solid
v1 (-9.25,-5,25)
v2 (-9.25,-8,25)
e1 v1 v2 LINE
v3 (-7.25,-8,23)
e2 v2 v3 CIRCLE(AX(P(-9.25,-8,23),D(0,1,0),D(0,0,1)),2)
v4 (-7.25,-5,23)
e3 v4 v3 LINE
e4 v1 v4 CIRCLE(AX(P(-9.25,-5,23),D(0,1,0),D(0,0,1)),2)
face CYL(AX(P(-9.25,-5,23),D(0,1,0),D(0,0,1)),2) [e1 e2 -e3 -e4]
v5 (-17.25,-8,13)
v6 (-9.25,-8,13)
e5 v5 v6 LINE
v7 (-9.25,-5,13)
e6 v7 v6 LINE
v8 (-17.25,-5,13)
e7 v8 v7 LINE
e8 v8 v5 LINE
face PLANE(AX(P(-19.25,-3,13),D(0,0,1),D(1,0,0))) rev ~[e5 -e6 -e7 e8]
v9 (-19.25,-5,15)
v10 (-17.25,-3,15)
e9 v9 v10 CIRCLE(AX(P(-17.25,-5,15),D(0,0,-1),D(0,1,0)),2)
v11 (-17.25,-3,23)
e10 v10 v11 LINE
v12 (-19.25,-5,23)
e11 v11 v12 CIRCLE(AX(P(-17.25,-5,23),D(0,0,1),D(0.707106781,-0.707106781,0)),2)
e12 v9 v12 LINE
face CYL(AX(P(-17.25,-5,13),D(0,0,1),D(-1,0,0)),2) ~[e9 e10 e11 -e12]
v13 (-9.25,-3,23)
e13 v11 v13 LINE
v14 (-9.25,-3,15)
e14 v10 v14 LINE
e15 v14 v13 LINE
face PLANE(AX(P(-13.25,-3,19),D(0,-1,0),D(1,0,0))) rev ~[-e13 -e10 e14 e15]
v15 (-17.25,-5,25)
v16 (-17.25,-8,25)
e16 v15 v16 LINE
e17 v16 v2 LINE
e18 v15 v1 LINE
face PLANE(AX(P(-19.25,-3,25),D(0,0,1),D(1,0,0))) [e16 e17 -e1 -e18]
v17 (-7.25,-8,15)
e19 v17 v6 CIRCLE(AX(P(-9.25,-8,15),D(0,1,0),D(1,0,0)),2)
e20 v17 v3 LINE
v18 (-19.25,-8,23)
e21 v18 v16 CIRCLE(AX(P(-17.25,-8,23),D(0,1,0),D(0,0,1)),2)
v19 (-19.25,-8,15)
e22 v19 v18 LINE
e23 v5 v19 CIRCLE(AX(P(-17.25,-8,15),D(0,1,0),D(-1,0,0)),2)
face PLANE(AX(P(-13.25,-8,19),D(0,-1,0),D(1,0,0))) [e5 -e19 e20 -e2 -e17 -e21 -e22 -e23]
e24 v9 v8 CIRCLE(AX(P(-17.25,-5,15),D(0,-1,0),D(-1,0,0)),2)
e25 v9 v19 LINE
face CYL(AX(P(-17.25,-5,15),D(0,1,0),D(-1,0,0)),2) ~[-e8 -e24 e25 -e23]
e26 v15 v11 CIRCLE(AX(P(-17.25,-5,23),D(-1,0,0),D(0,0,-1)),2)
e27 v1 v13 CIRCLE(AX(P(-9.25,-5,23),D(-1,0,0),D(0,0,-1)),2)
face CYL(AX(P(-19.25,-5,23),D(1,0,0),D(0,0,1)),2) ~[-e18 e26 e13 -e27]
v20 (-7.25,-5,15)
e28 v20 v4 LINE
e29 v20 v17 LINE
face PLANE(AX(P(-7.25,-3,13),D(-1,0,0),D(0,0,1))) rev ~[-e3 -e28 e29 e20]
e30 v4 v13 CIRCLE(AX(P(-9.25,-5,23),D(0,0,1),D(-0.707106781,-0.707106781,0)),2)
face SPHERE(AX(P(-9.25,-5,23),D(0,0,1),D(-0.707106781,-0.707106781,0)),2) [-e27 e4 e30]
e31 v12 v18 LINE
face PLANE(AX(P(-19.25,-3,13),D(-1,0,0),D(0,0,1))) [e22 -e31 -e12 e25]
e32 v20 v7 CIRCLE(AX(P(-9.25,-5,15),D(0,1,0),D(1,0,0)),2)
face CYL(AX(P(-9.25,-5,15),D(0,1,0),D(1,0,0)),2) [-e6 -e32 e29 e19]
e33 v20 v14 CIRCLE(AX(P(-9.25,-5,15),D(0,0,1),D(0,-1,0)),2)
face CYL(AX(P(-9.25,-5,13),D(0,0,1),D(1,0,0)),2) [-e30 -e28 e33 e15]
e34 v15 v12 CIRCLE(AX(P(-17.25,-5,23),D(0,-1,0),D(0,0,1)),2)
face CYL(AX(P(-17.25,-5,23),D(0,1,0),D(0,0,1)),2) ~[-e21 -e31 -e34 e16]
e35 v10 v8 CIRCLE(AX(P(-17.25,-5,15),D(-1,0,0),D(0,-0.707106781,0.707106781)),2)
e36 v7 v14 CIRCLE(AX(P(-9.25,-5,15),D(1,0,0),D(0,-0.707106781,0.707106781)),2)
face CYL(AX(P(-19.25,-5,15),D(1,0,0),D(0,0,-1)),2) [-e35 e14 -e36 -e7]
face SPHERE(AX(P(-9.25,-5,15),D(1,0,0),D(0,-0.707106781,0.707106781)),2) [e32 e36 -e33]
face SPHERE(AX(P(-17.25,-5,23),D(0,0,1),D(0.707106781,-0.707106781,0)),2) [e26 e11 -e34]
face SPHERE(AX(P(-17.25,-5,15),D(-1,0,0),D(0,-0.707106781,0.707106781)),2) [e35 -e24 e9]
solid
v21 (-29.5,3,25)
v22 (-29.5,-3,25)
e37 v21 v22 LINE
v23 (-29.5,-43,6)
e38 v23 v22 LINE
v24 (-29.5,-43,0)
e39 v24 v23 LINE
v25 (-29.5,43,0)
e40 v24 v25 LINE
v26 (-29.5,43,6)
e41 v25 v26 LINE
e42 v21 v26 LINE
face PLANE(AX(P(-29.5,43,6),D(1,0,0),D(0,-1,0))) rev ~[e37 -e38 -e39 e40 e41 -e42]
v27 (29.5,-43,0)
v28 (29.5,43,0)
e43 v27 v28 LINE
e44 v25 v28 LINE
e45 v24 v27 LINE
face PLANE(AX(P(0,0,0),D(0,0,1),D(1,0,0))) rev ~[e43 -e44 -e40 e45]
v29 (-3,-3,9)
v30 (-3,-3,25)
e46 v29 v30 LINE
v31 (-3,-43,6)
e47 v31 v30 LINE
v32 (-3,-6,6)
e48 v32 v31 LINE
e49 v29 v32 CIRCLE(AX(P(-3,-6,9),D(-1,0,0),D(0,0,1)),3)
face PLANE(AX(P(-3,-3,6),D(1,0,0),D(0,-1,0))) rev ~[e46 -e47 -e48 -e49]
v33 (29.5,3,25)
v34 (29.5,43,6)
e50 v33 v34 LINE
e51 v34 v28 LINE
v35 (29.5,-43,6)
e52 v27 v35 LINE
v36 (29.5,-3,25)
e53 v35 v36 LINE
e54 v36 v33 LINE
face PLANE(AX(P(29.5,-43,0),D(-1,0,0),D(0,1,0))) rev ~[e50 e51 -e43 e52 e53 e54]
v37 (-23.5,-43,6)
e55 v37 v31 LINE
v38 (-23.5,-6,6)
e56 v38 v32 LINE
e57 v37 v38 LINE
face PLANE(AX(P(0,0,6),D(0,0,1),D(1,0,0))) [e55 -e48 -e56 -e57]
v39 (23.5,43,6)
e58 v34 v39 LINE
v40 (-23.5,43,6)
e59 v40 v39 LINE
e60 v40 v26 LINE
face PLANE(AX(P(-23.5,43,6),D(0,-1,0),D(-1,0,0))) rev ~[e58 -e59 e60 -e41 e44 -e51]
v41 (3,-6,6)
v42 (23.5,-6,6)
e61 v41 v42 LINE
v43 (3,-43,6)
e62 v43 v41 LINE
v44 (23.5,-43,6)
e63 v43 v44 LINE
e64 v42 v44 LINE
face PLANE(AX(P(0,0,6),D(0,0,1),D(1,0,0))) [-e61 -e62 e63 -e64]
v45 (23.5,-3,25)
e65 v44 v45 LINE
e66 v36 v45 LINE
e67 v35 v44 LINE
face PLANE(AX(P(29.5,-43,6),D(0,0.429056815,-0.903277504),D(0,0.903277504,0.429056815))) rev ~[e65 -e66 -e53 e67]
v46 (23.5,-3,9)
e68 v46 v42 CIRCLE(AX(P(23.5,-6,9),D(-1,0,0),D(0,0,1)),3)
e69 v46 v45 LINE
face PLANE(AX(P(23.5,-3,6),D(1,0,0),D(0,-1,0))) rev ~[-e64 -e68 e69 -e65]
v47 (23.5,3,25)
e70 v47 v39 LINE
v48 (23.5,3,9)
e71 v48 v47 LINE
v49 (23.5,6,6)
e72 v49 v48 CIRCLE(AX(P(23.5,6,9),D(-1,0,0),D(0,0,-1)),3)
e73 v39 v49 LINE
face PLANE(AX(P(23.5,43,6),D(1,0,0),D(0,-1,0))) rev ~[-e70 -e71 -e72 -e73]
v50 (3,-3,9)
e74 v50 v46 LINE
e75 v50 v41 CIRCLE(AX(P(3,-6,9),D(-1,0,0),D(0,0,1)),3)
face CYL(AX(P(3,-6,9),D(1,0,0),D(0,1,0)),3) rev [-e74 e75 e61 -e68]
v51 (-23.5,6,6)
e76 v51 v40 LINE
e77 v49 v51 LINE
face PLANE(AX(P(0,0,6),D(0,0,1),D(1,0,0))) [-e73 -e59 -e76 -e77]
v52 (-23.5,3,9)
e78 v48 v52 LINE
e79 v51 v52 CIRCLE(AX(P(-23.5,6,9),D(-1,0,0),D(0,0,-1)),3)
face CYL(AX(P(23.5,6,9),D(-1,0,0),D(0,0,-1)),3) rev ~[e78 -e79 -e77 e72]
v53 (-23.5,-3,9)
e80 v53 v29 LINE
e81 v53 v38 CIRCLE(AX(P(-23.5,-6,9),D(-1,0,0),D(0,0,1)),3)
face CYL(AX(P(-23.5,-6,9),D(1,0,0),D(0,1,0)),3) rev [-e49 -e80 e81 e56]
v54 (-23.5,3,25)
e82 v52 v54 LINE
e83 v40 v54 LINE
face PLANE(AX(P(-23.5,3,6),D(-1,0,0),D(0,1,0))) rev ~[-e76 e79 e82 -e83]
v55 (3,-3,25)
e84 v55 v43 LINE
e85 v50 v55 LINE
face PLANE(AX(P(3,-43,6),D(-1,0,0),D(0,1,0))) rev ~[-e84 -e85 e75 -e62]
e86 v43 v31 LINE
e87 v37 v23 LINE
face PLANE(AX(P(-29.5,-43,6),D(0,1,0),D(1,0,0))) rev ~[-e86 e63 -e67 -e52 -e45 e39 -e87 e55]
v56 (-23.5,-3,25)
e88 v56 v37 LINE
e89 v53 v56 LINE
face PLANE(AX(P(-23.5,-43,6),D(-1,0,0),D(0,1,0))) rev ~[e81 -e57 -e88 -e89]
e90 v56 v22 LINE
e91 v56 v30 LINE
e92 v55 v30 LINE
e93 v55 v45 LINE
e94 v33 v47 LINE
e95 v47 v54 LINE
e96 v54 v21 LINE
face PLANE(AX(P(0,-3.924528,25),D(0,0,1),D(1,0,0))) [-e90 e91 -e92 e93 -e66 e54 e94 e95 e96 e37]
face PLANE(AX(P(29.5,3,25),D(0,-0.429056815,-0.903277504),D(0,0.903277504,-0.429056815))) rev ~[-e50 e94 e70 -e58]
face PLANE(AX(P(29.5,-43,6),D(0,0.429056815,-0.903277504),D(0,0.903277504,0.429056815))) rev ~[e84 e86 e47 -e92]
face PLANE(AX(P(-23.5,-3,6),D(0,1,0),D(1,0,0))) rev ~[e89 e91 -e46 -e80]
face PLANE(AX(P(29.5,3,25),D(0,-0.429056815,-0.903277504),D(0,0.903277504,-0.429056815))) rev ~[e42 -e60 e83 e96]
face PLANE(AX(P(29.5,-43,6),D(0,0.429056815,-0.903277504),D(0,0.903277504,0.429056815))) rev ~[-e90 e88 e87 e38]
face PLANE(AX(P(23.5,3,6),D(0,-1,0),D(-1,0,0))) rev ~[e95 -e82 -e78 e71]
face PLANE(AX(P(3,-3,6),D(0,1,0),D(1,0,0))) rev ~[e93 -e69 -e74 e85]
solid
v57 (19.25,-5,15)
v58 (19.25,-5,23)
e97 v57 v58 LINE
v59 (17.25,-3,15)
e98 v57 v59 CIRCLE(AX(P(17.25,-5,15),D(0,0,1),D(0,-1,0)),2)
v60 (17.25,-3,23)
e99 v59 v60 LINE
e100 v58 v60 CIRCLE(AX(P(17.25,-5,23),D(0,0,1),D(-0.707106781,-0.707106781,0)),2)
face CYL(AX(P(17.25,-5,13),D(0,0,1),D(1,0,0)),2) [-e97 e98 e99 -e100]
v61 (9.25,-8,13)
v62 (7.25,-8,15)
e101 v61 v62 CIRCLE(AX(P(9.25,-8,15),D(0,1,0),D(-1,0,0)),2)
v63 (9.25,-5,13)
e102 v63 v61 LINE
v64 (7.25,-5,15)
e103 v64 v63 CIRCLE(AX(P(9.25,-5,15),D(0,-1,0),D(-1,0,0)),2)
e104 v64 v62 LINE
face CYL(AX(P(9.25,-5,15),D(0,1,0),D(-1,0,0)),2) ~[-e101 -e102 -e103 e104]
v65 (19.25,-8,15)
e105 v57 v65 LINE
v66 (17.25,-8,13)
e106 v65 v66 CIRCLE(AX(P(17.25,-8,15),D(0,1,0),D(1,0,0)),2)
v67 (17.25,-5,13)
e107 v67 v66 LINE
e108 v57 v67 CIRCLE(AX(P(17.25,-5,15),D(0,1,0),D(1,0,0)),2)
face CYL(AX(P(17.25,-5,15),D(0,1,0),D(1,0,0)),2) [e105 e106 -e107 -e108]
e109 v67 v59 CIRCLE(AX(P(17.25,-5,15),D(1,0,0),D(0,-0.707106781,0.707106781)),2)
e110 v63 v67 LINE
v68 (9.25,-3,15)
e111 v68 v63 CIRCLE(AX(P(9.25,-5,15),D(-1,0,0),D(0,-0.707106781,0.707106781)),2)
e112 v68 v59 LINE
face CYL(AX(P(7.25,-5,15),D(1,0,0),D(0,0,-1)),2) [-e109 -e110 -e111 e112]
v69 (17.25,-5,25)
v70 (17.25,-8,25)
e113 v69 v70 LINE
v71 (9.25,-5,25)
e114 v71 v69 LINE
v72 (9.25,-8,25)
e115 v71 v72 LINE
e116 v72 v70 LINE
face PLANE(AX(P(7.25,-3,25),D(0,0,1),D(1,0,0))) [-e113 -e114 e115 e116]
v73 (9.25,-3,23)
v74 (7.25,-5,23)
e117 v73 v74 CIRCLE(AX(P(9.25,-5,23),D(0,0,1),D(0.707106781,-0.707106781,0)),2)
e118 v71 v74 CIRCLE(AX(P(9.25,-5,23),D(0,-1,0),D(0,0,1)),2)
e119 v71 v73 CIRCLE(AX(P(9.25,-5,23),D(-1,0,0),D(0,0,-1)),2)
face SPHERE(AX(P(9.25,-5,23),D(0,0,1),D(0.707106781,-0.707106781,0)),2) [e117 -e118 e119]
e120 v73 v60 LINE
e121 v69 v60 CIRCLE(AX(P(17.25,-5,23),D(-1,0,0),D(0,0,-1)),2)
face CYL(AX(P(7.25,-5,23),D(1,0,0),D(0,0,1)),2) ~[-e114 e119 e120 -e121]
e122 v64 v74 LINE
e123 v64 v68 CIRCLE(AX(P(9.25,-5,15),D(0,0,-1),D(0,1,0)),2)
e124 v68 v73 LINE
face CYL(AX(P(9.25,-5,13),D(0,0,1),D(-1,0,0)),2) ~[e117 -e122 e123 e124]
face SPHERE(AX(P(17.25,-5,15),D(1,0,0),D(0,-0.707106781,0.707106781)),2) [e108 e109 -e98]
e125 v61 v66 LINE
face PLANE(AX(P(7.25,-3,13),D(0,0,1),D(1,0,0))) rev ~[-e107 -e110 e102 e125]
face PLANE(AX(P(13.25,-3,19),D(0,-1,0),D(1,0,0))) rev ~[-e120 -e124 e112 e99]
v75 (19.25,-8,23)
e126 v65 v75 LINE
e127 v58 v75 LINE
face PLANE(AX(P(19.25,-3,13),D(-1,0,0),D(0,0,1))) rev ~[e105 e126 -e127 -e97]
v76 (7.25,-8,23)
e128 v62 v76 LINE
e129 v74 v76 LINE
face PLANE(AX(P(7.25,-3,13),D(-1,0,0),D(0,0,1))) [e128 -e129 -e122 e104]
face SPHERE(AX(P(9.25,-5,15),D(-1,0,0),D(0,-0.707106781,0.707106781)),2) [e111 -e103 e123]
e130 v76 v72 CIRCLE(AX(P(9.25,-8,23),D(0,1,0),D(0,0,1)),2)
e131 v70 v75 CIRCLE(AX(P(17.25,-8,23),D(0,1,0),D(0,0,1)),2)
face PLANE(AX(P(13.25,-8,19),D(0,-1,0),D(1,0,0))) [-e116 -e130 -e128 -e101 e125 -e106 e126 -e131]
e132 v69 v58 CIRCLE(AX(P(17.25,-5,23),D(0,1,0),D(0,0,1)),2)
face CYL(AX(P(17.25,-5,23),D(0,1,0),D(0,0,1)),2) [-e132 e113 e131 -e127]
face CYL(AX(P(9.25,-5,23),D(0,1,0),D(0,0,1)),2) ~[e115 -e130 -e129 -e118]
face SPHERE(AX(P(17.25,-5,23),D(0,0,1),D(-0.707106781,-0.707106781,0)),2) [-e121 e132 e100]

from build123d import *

# Parameters (mm, degrees)
F0_W             = 59
F0_H             = 86
F1_DEPTH         = 6
F3_DEPTH         = 19
F5_DEPTH         = 59.001
F7_R             = 3
F6_W             = 12
F6_H             = 12
F8_DEPTH         = 5
F9_R             = 2
F10_T1_DEPTH     = 8
F10_S5_W         = 2
F10_S5_H         = 2
F10_T6_DEPTH     = 2
F10_S11_W        = 2
F10_S11_H        = 2
F10_T12_DEPTH    = 2
F10_S17_W        = 2
F10_S17_H        = 2
F10_T18_DEPTH    = 2
F10_S23_W        = 2
F10_S23_H        = 2
F10_T24_DEPTH    = 2
F10_S1_T1_DEPTH  = 8
F10_S1_S5_W      = 2
F10_S1_S5_H      = 2
F10_S1_T6_DEPTH  = 2
F10_S1_S11_W     = 2
F10_S1_S11_H     = 2
F10_S1_T12_DEPTH = 2
F10_S1_S17_W     = 2
F10_S1_S17_H     = 2
F10_S1_T18_DEPTH = 2
F10_S1_S23_W     = 2
F10_S1_S23_H     = 2
F10_S1_T24_DEPTH = 2


# Not quite as in the source:
# - a fillet or chamfer that OpenCascade refuses, or shapes differently, is made with other operations: its cross-section is extruded or revolved along the edge and cut away or added


with BuildPart() as f1:
    # F0 (on Top) → F1 (new body)
    with BuildSketch(Plane.XY):
        Rectangle(F0_W, F0_H)
    extrude(amount=F1_DEPTH)

    # F2 (on face) → F3 (join)
    with BuildSketch(Plane.XY.offset(6)):
        Polygon((-23.5, 43), (-29.5, 43), (-29.5, -43), (-23.5, -43), (-23.5, -3), (-3, -3), (-3, -43), (3, -43), (3, -3), (23.5, -3), (23.5, -43), (29.5, -43), (29.5, 43), (23.5, 43), (23.5, 3), (-23.5, 3), align=None)
    extrude(amount=F3_DEPTH)

    # F4 (on face) → F5 (cut, through all)
    with BuildSketch(Plane.YZ.offset(29.5)):
        Polygon((-43, 25), (-43, 6), (-3, 25), align=None)
        Polygon((43, 25), (3, 25), (43, 6), align=None)
    extrude(amount=-F5_DEPTH, mode=Mode.SUBTRACT)

    # F7
    f7_edges = [f1.edges().sort_by_distance(p)[0] for p in [
        (-13.25, -3, 6),
        (13.25, -3, 6),
        (0, 3, 6),
    ]]
    fillet(f7_edges, radius=F7_R)


with BuildPart() as f8:
    # F6 (on face) → F8 (new body)
    with BuildSketch(Plane.XZ.offset(3)):
        with Locations((-13.25, 19)):
            Rectangle(F6_W, F6_H)
        with Locations((13.25, 19)):
            Rectangle(F6_W, F6_H)
    extrude(amount=F8_DEPTH)

    # F9
    f9_edges = [f8.edges().sort_by_distance(p)[0] for p in [
        (-7.25, -3, 19),
        (-13.25, -3, 25),
        (-19.25, -3, 19),
        (-13.25, -3, 13),
        (13.25, -3, 13),
        (7.25, -3, 19),
        (19.25, -3, 19),
        (13.25, -3, 25),
    ]]
    fillet(f9_edges, radius=F9_R)

    # F10: fillet of radius 2 on 4 edges, made by hand

    # F10_s2 → F10_t1 (cut)
    with BuildSketch(Plane.XZ.offset(5)):
        with BuildLine():
            ThreePointArc((-7.25, 15), (-7.8357864376, 13.5857864376), (-9.25, 13))
            Line((-9.25, 13), (-7.25, 13))
            Line((-7.25, 13), (-7.25, 15))
        make_face()
        with BuildLine():
            ThreePointArc((-19.25, 15), (-18.6642135624, 13.5857864376), (-17.25, 13))
            Line((-17.25, 13), (-19.25, 13))
            Line((-19.25, 13), (-19.25, 15))
        make_face()
        with BuildLine():
            ThreePointArc((-9.25, 25), (-7.8357864376, 24.4142135624), (-7.25, 23))
            Line((-7.25, 23), (-7.25, 25))
            Line((-7.25, 25), (-9.25, 25))
        make_face()
        with BuildLine():
            ThreePointArc((-17.25, 25), (-18.6642135624, 24.4142135624), (-19.25, 23))
            Line((-19.25, 23), (-19.25, 25))
            Line((-19.25, 25), (-17.25, 25))
        make_face()
    extrude(amount=F10_T1_DEPTH, mode=Mode.SUBTRACT)


with BuildPart() as f10_tool4:
    # F10_s5 → F10_t6 (new body)
    with BuildSketch(Plane.XY.offset(23)):
        with Locations((-18.25, -4)):
            Rectangle(F10_S5_W, F10_S5_H)
    extrude(amount=F10_T6_DEPTH)

    # F10_s7 → F10_t8 (revolve, cut)
    with BuildSketch(Plane(origin=(-17.25, -5, 23), x_dir=(0.7071067812, -0.7071067812, 0), z_dir=(-0.7071067812, -0.7071067812, 0))):
        with BuildLine():
            ThreePointArc((0, -2), (2, 0), (0, 2))
            Line((0, 2), (0, -2))
        make_face()
    revolve(axis=Axis((-17.25, -5, 23), (0, 0, 1)), mode=Mode.SUBTRACT)


with BuildPart() as f8_1:
    add(f8.part)

    # F10_t3: cut F10_tool4
    add(f10_tool4.part, mode=Mode.SUBTRACT)


with BuildPart() as f10_tool10:
    # F10_s11 → F10_t12 (new body)
    with BuildSketch(Plane.XY.offset(23)):
        with Locations((-8.25, -4)):
            Rectangle(F10_S11_W, F10_S11_H)
    extrude(amount=F10_T12_DEPTH)

    # F10_s13 → F10_t14 (revolve, cut)
    with BuildSketch(Plane(origin=(-9.25, -5, 23), x_dir=(-0.7071067812, -0.7071067812, 0), z_dir=(-0.7071067812, 0.7071067812, 0))):
        with BuildLine():
            ThreePointArc((0, -2), (2, 0), (0, 2))
            Line((0, 2), (0, -2))
        make_face()
    revolve(axis=Axis((-9.25, -5, 23), (0, 0, 1)), mode=Mode.SUBTRACT)


with BuildPart() as f8_2:
    add(f8_1.part)

    # F10_t9: cut F10_tool10
    add(f10_tool10.part, mode=Mode.SUBTRACT)


with BuildPart() as f10_tool16:
    # F10_s17 → F10_t18 (new body)
    with BuildSketch(Plane.YZ.offset(-17.25)):
        with Locations((-4, 14)):
            Rectangle(F10_S17_W, F10_S17_H)
    extrude(amount=-F10_T18_DEPTH)

    # F10_s19 → F10_t20 (revolve, cut)
    with BuildSketch(Plane(origin=(-17.25, -5, 15), x_dir=(0, -0.7071067812, 0.7071067812), z_dir=(0, -0.7071067812, -0.7071067812))):
        with BuildLine():
            ThreePointArc((0, -2), (2, 0), (0, 2))
            Line((0, 2), (0, -2))
        make_face()
    revolve(axis=Axis((-17.25, -5, 15), (-1, 0, 0)), mode=Mode.SUBTRACT)


with BuildPart() as f8_3:
    add(f8_2.part)

    # F10_t15: cut F10_tool16
    add(f10_tool16.part, mode=Mode.SUBTRACT)


with BuildPart() as f10_tool22:
    # F10_s23 → F10_t24 (new body)
    with BuildSketch(Plane.YZ.offset(-9.25)):
        with Locations((-4, 14)):
            Rectangle(F10_S23_W, F10_S23_H)
    extrude(amount=F10_T24_DEPTH)

    # F10_s25 → F10_t26 (revolve, cut)
    with BuildSketch(Plane(origin=(-9.25, -5, 15), x_dir=(0, -0.7071067812, 0.7071067812), z_dir=(0, 0.7071067812, 0.7071067812))):
        with BuildLine():
            ThreePointArc((0, -2), (2, 0), (0, 2))
            Line((0, 2), (0, -2))
        make_face()
    revolve(axis=Axis((-9.25, -5, 15), (1, 0, 0)), mode=Mode.SUBTRACT)


with BuildPart() as f8_4:
    add(f8_3.part)

    # F10_t21: cut F10_tool22
    add(f10_tool22.part, mode=Mode.SUBTRACT)

    # F10#s1: fillet of radius 2 on 4 edges, made by hand

    # F10_s1_s2 → F10_s1_t1 (cut)
    with BuildSketch(Plane.XZ.offset(5)):
        with BuildLine():
            ThreePointArc((19.25, 15), (18.6642135624, 13.5857864376), (17.25, 13))
            Line((17.25, 13), (19.25, 13))
            Line((19.25, 13), (19.25, 15))
        make_face()
        with BuildLine():
            ThreePointArc((17.25, 25), (18.6642135624, 24.4142135624), (19.25, 23))
            Line((19.25, 23), (19.25, 25))
            Line((19.25, 25), (17.25, 25))
        make_face()
        with BuildLine():
            ThreePointArc((7.25, 15), (7.8357864376, 13.5857864376), (9.25, 13))
            Line((9.25, 13), (7.25, 13))
            Line((7.25, 13), (7.25, 15))
        make_face()
        with BuildLine():
            ThreePointArc((9.25, 25), (7.8357864376, 24.4142135624), (7.25, 23))
            Line((7.25, 23), (7.25, 25))
            Line((7.25, 25), (9.25, 25))
        make_face()
    extrude(amount=F10_S1_T1_DEPTH, mode=Mode.SUBTRACT)


with BuildPart() as f10_s1_tool4:
    # F10_s1_s5 → F10_s1_t6 (new body)
    with BuildSketch(Plane.XY.offset(23)):
        with Locations((8.25, -4)):
            Rectangle(F10_S1_S5_W, F10_S1_S5_H)
    extrude(amount=F10_S1_T6_DEPTH)

    # F10_s1_s7 → F10_s1_t8 (revolve, cut)
    with BuildSketch(Plane(origin=(9.25, -5, 23), x_dir=(0.7071067812, -0.7071067812, 0), z_dir=(-0.7071067812, -0.7071067812, 0))):
        with BuildLine():
            ThreePointArc((0, -2), (2, 0), (0, 2))
            Line((0, 2), (0, -2))
        make_face()
    revolve(axis=Axis((9.25, -5, 23), (0, 0, 1)), mode=Mode.SUBTRACT)


with BuildPart() as f8_5:
    add(f8_4.part)

    # F10_s1_t3: cut F10_s1_tool4
    add(f10_s1_tool4.part, mode=Mode.SUBTRACT)


with BuildPart() as f10_s1_tool10:
    # F10_s1_s11 → F10_s1_t12 (new body)
    with BuildSketch(Plane.YZ.offset(9.25)):
        with Locations((-4, 14)):
            Rectangle(F10_S1_S11_W, F10_S1_S11_H)
    extrude(amount=-F10_S1_T12_DEPTH)

    # F10_s1_s13 → F10_s1_t14 (revolve, cut)
    with BuildSketch(Plane(origin=(9.25, -5, 15), x_dir=(0, -0.7071067812, 0.7071067812), z_dir=(0, -0.7071067812, -0.7071067812))):
        with BuildLine():
            ThreePointArc((0, -2), (2, 0), (0, 2))
            Line((0, 2), (0, -2))
        make_face()
    revolve(axis=Axis((9.25, -5, 15), (-1, 0, 0)), mode=Mode.SUBTRACT)


with BuildPart() as f8_6:
    add(f8_5.part)

    # F10_s1_t9: cut F10_s1_tool10
    add(f10_s1_tool10.part, mode=Mode.SUBTRACT)


with BuildPart() as f10_s1_tool16:
    # F10_s1_s17 → F10_s1_t18 (new body)
    with BuildSketch(Plane.XY.offset(23)):
        with Locations((18.25, -4)):
            Rectangle(F10_S1_S17_W, F10_S1_S17_H)
    extrude(amount=F10_S1_T18_DEPTH)

    # F10_s1_s19 → F10_s1_t20 (revolve, cut)
    with BuildSketch(Plane(origin=(17.25, -5, 23), x_dir=(-0.7071067812, -0.7071067812, 0), z_dir=(-0.7071067812, 0.7071067812, 0))):
        with BuildLine():
            ThreePointArc((0, -2), (2, 0), (0, 2))
            Line((0, 2), (0, -2))
        make_face()
    revolve(axis=Axis((17.25, -5, 23), (0, 0, 1)), mode=Mode.SUBTRACT)


with BuildPart() as f8_7:
    add(f8_6.part)

    # F10_s1_t15: cut F10_s1_tool16
    add(f10_s1_tool16.part, mode=Mode.SUBTRACT)


with BuildPart() as f10_s1_tool22:
    # F10_s1_s23 → F10_s1_t24 (new body)
    with BuildSketch(Plane.YZ.offset(17.25)):
        with Locations((-4, 14)):
            Rectangle(F10_S1_S23_W, F10_S1_S23_H)
    extrude(amount=F10_S1_T24_DEPTH)

    # F10_s1_s25 → F10_s1_t26 (revolve, cut)
    with BuildSketch(Plane(origin=(17.25, -5, 15), x_dir=(0, -0.7071067812, 0.7071067812), z_dir=(0, 0.7071067812, 0.7071067812))):
        with BuildLine():
            ThreePointArc((0, -2), (2, 0), (0, 2))
            Line((0, 2), (0, -2))
        make_face()
    revolve(axis=Axis((17.25, -5, 15), (1, 0, 0)), mode=Mode.SUBTRACT)


with BuildPart() as f8_8:
    add(f8_7.part)

    # F10_s1_t21: cut F10_s1_tool22
    add(f10_s1_tool22.part, mode=Mode.SUBTRACT)


solid = Compound([f1.part, f8_8.part])
